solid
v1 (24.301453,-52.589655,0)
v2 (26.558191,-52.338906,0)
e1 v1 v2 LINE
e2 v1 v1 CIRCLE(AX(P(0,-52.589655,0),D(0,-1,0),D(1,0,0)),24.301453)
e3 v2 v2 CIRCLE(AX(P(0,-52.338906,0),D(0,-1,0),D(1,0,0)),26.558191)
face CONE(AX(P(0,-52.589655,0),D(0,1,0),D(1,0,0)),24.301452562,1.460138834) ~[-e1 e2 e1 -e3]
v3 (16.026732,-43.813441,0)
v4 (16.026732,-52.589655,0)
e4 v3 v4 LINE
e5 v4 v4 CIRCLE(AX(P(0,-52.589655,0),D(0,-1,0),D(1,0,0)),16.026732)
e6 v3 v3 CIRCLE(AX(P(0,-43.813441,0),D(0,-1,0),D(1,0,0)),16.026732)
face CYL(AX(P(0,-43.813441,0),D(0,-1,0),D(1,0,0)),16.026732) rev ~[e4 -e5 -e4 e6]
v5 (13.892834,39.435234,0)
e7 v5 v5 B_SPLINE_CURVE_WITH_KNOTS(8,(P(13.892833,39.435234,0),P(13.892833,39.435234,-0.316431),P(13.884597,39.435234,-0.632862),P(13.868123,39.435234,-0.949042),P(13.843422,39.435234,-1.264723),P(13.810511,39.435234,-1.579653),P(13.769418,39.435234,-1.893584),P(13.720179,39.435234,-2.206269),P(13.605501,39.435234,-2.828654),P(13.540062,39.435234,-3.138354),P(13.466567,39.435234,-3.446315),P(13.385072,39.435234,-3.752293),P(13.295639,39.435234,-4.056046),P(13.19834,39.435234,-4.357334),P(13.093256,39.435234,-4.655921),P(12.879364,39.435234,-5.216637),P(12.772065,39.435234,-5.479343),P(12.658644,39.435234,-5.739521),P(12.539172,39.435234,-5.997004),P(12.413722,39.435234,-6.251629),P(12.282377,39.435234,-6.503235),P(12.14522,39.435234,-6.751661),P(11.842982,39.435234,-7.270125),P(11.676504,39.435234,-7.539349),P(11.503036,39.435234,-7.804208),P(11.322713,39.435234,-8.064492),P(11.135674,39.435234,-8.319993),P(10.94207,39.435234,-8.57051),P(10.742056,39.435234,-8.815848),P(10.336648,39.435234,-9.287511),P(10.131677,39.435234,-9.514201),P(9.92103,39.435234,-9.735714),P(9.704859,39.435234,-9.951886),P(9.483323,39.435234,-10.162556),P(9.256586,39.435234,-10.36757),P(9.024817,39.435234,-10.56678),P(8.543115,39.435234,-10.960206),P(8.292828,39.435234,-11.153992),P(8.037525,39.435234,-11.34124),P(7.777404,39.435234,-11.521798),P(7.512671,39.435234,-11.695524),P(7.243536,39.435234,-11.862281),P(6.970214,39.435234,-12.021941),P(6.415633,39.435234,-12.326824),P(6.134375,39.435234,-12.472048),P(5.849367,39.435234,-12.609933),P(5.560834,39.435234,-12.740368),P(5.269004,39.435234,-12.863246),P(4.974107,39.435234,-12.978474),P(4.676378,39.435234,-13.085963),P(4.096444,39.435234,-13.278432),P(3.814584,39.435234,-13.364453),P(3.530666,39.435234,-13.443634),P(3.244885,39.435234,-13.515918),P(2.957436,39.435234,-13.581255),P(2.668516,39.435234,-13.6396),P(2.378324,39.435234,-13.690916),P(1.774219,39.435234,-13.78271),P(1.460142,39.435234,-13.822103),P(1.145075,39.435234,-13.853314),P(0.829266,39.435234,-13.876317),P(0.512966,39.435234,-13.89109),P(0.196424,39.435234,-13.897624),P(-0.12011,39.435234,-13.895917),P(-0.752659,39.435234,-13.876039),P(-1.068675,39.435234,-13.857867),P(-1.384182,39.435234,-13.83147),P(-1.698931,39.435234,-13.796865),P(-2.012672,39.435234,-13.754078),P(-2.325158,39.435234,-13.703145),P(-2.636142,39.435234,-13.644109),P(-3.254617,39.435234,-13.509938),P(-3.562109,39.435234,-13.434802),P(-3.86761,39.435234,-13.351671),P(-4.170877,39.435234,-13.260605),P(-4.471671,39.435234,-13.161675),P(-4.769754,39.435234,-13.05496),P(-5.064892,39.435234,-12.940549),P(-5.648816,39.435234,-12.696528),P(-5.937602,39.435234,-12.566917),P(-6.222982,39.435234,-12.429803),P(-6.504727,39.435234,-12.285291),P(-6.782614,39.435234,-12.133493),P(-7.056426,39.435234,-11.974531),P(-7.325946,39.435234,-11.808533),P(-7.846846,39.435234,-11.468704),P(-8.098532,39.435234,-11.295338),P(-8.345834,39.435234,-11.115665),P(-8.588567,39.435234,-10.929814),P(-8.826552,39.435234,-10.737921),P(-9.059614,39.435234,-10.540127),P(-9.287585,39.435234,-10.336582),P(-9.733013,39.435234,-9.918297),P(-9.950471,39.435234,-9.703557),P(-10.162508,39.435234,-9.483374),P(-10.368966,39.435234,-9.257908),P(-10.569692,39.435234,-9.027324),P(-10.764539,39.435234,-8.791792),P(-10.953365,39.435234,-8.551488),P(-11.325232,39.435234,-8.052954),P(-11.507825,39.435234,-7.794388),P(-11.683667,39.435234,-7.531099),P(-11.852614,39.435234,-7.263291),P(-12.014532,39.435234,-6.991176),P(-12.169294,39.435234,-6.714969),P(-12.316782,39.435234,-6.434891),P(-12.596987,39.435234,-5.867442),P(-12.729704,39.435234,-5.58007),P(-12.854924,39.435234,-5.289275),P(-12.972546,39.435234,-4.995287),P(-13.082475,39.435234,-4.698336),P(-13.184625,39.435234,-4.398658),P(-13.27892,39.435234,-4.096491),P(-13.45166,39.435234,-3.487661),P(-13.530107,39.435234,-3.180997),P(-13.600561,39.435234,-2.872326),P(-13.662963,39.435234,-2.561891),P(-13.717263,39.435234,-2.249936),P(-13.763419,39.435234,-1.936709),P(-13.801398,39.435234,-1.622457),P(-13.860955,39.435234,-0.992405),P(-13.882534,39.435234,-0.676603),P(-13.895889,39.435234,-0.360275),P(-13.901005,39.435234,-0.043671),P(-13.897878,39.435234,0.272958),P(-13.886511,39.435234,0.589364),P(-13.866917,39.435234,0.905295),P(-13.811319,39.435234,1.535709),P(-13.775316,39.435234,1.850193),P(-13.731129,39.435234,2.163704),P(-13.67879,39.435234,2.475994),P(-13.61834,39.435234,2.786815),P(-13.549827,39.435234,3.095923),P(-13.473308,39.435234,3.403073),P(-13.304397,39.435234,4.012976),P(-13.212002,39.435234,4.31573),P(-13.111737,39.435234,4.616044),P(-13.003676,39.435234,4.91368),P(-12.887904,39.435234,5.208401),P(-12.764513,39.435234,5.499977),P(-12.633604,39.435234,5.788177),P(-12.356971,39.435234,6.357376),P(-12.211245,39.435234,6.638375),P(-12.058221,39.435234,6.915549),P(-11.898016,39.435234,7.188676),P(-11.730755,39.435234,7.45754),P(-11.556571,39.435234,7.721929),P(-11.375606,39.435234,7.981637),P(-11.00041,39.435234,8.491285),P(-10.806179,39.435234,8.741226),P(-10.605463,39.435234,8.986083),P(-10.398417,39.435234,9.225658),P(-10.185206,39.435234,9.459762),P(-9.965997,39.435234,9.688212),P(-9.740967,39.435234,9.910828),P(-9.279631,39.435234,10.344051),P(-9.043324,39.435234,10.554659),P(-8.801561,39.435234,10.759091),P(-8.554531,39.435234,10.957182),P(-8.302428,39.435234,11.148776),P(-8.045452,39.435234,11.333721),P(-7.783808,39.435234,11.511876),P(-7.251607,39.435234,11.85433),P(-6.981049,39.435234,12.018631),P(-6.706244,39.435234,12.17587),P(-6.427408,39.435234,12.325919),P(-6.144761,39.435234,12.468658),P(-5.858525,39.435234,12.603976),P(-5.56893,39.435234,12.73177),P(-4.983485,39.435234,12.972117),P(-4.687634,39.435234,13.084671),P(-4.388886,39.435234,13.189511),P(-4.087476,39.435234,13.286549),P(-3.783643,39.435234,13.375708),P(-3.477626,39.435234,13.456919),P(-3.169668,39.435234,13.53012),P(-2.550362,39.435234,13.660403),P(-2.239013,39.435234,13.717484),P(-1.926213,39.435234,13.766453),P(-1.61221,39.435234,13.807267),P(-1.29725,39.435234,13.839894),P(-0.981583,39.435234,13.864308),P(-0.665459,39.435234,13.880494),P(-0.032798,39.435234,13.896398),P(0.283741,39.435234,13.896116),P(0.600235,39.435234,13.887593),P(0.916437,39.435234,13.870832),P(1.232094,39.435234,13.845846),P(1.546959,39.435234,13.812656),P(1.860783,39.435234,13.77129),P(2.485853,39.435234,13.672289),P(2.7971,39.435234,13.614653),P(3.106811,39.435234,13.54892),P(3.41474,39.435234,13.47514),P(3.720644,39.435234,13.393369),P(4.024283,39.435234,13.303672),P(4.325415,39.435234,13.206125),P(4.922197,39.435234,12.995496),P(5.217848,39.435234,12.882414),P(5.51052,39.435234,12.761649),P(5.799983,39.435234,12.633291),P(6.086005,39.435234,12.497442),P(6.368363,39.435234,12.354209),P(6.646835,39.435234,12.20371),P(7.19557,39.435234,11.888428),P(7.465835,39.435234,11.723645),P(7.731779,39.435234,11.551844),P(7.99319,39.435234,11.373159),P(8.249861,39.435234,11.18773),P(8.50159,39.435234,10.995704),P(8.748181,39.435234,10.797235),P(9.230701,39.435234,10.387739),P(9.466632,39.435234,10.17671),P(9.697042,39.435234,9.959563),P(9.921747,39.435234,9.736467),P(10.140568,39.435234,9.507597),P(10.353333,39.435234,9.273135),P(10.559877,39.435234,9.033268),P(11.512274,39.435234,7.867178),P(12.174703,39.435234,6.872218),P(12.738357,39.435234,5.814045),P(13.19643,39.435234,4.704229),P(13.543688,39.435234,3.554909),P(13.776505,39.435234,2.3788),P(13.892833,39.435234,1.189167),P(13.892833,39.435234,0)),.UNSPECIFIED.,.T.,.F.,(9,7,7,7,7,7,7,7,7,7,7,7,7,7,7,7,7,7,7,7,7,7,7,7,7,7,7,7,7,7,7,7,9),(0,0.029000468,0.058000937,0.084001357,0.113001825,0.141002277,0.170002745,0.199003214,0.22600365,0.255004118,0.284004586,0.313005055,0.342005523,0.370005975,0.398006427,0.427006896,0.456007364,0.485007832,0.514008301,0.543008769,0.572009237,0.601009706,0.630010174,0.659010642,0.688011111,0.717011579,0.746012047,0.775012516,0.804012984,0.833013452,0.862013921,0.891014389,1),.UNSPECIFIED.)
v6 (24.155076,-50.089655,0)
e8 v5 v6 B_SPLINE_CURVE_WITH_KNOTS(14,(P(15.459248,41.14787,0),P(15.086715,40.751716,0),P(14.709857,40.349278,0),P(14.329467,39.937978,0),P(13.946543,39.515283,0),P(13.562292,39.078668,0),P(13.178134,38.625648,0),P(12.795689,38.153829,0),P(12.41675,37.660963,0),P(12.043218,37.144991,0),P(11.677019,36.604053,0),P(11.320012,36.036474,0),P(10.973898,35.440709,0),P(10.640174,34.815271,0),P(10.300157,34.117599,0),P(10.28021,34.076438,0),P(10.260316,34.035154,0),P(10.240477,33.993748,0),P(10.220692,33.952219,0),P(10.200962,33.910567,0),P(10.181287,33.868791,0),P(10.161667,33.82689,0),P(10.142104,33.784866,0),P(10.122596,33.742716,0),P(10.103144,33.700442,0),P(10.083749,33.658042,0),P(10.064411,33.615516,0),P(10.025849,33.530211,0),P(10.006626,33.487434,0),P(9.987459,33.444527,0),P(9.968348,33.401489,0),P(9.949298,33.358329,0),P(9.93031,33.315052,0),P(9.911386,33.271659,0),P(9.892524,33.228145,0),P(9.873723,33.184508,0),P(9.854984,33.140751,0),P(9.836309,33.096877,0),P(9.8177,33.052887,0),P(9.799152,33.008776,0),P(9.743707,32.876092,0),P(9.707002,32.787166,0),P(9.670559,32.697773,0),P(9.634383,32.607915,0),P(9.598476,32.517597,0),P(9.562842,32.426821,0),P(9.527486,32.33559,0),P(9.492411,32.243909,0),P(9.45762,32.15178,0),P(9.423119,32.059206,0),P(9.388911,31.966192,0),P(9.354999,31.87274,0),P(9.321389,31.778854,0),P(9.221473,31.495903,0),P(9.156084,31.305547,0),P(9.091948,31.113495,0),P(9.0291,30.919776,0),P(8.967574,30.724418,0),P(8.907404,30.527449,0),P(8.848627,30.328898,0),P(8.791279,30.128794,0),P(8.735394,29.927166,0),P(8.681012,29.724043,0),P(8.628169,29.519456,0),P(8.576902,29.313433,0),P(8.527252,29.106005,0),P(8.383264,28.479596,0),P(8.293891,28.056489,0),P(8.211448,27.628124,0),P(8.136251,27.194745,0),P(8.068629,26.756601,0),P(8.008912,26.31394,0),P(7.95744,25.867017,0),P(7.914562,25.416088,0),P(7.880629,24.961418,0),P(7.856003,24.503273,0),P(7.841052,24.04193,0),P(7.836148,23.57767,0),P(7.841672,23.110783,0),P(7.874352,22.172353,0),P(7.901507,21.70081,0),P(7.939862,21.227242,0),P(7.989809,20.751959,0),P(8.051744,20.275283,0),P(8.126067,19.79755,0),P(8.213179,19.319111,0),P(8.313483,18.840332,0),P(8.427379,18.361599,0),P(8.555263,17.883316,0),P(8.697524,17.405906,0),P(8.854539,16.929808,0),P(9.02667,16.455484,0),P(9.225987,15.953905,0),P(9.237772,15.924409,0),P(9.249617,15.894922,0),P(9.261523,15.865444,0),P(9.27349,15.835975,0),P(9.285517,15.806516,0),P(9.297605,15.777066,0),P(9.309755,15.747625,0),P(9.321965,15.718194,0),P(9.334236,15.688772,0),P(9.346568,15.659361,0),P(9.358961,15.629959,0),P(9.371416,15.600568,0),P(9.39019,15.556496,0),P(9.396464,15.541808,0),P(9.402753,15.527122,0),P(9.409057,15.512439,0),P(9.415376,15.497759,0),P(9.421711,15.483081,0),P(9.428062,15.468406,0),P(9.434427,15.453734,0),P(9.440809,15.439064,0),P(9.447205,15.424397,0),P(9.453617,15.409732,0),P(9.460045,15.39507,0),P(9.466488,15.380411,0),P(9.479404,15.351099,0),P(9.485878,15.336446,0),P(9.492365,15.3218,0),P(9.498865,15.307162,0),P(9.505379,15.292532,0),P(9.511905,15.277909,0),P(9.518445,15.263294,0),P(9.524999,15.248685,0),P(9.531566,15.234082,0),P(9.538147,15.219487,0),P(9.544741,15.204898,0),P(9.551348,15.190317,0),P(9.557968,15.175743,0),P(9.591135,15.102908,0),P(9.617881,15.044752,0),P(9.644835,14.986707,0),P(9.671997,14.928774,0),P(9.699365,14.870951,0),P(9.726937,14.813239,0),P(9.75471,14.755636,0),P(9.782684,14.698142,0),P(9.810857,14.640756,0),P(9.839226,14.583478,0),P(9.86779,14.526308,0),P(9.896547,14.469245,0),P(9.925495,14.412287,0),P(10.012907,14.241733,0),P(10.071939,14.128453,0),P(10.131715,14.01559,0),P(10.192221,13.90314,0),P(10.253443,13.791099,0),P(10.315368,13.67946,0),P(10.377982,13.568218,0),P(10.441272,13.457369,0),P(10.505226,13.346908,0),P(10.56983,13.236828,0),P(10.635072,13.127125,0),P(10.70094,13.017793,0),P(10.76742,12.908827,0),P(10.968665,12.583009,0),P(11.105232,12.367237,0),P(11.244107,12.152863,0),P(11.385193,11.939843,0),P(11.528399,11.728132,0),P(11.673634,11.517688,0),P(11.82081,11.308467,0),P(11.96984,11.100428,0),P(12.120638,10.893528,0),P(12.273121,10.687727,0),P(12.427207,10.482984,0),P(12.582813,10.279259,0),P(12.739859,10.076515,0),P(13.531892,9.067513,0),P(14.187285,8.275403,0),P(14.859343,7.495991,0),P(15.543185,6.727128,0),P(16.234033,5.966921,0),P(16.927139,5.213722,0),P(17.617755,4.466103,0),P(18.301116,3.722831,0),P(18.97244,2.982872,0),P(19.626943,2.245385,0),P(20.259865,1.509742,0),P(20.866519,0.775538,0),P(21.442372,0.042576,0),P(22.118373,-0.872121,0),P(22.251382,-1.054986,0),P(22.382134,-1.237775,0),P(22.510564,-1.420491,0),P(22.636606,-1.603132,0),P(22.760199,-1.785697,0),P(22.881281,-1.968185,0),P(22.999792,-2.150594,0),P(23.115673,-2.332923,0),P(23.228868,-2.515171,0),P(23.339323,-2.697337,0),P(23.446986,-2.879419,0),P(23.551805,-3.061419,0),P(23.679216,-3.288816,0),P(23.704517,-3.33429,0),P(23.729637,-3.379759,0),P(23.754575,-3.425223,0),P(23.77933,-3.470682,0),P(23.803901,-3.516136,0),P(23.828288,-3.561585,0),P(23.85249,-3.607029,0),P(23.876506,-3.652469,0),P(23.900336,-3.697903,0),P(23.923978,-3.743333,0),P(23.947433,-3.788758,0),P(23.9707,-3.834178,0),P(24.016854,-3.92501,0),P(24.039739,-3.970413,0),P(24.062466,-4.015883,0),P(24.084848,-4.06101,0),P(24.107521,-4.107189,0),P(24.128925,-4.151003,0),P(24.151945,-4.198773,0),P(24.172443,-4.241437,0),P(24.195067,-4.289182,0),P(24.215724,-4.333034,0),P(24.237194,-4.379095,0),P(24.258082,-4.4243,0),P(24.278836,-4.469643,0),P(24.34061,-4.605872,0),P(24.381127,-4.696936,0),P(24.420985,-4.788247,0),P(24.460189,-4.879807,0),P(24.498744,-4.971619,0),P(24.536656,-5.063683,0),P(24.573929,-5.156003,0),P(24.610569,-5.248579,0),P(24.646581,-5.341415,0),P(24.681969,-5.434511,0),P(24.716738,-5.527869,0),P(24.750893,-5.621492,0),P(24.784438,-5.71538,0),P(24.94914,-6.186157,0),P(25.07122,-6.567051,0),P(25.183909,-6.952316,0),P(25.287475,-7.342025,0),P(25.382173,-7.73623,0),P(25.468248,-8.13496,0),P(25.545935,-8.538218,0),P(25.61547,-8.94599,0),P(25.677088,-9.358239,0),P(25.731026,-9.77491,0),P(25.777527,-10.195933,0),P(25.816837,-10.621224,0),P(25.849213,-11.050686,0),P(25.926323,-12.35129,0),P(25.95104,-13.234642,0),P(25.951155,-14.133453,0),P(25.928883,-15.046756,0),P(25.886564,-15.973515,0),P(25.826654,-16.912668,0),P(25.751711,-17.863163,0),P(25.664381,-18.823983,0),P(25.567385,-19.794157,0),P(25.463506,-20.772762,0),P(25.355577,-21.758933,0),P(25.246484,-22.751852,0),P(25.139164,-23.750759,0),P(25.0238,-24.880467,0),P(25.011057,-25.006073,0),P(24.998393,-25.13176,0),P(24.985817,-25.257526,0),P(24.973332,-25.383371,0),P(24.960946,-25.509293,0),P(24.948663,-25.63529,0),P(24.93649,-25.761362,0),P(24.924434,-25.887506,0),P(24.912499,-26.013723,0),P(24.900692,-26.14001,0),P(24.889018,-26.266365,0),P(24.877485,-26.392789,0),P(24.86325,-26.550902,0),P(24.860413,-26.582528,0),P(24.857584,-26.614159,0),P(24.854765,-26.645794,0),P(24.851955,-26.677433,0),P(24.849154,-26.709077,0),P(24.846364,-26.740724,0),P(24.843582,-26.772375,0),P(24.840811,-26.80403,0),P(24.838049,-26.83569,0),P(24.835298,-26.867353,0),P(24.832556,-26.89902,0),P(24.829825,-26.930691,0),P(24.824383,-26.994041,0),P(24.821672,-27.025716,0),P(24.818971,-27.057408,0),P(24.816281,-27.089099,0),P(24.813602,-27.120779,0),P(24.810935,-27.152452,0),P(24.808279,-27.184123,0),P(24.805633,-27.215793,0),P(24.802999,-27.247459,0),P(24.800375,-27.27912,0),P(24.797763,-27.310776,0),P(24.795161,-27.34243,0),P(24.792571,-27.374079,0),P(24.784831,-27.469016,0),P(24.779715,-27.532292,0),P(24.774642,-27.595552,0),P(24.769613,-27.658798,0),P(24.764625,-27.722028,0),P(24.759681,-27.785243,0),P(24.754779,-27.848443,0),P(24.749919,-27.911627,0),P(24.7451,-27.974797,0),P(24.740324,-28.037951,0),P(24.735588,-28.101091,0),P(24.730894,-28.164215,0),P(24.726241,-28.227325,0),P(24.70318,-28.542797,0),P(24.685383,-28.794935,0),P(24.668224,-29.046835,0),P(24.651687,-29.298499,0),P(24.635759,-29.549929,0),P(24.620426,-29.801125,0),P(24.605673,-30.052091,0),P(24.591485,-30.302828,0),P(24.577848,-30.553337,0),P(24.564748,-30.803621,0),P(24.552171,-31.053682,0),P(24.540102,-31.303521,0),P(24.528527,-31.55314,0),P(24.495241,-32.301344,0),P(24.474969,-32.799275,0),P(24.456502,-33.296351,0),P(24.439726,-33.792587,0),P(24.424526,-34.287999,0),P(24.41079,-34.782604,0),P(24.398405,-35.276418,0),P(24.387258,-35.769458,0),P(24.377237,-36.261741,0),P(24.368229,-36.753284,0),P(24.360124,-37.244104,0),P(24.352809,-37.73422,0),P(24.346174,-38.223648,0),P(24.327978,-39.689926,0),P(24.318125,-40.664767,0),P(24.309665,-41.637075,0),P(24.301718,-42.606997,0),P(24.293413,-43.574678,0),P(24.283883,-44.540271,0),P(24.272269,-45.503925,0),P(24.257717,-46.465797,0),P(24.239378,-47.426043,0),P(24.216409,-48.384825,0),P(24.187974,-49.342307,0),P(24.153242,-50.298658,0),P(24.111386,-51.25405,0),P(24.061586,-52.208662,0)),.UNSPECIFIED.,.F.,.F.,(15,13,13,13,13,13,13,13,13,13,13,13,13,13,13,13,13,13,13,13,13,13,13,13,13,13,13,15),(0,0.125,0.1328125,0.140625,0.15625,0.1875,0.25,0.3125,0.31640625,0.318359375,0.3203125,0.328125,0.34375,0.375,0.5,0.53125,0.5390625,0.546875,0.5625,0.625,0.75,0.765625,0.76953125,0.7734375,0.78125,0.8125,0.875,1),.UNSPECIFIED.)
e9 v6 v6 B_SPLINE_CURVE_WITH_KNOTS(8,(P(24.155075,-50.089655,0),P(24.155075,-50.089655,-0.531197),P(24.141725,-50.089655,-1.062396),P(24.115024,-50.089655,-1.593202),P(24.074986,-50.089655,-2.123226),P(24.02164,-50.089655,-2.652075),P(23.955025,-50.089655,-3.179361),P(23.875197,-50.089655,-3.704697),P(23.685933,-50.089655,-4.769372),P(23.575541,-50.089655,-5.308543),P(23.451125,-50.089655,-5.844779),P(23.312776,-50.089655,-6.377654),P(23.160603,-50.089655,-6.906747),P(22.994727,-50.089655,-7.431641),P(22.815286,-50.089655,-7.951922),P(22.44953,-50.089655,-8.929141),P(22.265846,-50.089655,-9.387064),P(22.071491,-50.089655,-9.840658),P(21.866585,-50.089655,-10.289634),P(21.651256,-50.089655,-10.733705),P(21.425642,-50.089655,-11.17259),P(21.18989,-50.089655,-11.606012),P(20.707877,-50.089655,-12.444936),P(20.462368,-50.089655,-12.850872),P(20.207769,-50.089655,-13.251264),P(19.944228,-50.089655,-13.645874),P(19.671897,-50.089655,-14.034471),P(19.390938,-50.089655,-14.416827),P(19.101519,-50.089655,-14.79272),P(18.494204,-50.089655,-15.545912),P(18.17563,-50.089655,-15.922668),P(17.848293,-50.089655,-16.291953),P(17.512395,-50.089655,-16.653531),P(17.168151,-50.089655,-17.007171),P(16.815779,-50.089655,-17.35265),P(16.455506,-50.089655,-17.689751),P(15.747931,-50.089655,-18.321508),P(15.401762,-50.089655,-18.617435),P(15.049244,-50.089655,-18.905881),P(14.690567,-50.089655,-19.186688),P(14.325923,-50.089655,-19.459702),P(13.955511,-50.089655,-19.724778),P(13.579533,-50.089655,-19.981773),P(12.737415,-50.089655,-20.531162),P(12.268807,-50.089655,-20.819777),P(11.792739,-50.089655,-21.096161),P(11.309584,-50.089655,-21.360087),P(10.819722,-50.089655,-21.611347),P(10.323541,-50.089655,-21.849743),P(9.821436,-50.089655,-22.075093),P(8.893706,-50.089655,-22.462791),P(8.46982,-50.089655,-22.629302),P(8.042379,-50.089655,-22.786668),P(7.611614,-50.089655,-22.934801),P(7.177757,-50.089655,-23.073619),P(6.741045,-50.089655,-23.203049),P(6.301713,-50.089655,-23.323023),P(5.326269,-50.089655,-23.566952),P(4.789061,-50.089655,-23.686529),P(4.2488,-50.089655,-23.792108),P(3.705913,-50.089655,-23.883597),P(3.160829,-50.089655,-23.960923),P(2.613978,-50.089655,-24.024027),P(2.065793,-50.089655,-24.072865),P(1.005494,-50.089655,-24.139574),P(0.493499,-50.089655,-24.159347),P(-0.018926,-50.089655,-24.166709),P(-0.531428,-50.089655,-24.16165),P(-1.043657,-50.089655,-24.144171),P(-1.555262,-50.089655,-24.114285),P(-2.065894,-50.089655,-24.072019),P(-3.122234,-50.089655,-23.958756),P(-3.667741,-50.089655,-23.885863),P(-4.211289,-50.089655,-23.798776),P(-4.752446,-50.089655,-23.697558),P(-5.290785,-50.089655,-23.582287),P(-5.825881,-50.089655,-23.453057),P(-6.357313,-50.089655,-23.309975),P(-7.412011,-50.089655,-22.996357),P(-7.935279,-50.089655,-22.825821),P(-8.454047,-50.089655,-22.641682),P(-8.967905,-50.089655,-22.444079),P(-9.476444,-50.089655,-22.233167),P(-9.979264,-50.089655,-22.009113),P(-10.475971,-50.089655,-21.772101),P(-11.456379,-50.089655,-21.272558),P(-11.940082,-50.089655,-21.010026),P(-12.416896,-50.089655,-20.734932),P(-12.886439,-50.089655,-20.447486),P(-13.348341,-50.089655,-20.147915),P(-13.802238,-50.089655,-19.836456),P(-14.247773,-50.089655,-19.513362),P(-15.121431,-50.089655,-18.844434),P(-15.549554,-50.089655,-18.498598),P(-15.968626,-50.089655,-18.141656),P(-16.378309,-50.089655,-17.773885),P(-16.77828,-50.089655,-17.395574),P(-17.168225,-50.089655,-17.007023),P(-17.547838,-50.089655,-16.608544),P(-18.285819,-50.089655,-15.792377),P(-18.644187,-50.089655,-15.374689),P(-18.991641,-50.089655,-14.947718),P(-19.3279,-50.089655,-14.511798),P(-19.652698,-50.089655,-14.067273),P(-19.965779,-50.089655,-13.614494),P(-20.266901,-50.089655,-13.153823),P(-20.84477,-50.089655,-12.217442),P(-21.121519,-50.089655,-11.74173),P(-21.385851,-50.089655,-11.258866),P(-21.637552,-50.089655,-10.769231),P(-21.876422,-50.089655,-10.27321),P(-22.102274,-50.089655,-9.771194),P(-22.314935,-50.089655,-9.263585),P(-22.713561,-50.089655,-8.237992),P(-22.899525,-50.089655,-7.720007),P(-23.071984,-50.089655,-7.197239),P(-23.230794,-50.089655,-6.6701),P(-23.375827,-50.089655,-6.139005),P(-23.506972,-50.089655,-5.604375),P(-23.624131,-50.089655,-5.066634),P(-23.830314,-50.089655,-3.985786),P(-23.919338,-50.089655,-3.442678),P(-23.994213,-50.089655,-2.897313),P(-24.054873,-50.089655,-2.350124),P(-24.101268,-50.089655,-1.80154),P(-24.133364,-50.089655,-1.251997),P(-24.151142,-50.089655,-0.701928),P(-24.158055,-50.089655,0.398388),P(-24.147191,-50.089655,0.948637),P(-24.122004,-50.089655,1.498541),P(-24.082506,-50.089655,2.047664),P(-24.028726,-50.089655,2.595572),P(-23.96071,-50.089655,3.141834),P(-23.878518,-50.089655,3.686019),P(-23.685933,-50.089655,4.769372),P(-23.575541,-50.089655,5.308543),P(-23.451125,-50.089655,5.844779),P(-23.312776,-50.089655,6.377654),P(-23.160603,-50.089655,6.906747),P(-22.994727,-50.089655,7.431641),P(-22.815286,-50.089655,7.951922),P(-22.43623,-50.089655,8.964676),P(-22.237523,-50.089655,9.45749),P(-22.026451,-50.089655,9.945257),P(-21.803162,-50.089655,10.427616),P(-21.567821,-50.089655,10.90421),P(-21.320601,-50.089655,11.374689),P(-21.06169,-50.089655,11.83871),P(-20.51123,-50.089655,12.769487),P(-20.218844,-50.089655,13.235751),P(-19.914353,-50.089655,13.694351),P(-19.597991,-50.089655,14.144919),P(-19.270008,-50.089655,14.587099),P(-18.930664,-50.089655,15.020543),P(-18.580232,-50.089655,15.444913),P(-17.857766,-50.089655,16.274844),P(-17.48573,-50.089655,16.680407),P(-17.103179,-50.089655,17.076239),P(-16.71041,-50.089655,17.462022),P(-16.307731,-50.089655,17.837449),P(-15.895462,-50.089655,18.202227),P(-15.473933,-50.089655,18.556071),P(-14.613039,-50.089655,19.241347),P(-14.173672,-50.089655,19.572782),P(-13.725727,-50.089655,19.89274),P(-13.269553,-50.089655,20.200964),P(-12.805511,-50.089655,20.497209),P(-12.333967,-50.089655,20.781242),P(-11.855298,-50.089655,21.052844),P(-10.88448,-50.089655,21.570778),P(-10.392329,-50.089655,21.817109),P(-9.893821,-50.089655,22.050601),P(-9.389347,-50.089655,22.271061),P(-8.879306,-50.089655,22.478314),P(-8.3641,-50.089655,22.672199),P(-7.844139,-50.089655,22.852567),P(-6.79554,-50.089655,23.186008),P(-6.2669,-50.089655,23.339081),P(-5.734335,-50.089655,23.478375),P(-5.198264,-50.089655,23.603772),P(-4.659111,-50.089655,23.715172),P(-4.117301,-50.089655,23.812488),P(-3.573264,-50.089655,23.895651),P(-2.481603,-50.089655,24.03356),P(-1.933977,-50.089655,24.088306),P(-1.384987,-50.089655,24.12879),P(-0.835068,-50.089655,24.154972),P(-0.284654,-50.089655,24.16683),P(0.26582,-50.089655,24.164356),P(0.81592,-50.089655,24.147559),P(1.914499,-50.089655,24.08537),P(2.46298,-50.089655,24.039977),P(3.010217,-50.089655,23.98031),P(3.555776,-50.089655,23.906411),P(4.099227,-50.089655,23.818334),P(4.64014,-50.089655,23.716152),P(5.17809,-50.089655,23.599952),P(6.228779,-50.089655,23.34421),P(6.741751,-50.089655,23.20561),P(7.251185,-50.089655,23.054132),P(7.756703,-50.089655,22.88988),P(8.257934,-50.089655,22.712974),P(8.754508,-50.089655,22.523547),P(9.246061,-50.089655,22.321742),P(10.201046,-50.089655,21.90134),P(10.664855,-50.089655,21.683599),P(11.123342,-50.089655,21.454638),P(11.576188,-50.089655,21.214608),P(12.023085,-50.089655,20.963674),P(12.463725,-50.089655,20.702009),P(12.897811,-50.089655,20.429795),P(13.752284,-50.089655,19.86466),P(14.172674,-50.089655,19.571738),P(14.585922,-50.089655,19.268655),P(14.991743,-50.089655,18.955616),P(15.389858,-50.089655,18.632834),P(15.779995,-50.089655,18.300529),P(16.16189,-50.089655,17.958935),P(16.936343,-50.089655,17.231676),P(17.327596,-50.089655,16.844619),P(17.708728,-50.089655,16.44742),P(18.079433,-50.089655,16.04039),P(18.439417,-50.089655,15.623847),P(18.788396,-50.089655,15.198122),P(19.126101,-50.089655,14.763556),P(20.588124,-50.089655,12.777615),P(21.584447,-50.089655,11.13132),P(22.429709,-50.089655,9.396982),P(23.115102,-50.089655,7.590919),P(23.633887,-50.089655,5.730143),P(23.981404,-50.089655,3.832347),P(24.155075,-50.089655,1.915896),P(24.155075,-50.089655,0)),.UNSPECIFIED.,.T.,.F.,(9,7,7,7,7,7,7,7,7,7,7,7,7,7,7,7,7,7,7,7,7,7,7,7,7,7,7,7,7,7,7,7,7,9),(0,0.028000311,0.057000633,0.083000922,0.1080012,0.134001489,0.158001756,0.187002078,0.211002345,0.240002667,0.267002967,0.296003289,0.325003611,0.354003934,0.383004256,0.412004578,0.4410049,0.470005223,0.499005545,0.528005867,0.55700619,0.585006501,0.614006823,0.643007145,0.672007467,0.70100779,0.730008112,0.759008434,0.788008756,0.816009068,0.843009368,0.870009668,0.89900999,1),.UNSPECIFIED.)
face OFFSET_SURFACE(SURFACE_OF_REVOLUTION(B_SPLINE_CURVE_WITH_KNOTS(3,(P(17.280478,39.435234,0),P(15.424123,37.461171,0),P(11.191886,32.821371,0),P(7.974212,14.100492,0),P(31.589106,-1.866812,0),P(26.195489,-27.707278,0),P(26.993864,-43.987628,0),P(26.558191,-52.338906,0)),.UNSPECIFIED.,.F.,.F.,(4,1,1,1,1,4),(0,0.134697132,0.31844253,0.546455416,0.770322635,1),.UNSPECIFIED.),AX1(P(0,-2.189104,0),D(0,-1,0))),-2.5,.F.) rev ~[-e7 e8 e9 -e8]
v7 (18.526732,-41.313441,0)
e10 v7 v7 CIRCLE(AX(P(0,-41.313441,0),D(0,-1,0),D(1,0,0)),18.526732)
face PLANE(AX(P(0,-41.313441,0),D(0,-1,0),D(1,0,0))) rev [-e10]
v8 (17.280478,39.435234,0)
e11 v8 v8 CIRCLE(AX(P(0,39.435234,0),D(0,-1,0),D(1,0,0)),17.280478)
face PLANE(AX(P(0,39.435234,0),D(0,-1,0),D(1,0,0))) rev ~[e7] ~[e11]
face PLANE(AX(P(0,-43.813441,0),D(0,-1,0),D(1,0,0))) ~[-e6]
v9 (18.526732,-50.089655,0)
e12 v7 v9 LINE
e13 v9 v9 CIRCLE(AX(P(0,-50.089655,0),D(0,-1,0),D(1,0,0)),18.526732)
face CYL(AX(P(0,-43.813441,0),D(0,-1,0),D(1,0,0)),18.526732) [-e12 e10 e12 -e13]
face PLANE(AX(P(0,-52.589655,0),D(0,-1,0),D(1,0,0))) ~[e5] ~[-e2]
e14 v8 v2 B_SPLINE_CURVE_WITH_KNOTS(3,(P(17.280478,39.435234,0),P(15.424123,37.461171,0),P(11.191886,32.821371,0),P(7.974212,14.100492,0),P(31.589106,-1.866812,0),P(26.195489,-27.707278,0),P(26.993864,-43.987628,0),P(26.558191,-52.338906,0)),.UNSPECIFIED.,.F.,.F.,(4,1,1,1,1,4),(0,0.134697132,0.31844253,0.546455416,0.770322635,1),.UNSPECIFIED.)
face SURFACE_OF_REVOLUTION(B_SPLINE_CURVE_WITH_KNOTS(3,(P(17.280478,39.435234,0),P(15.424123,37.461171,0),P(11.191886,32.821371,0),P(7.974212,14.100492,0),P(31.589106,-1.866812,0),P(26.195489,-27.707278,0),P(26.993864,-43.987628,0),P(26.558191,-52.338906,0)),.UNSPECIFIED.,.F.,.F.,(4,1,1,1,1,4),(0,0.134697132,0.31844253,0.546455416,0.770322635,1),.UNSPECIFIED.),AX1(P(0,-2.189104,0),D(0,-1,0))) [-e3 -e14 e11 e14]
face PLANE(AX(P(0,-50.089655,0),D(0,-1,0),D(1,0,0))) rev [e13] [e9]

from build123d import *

# Parameters (mm, degrees)
F2_T = 2.5


# Not quite as in the source:
# - a shell that OpenCascade refuses in one call is made with other operations: the cavity is built on its own and cut out


with BuildPart() as f1:
    # F0 (on Top) → F1 (revolve)
    with BuildSketch(Plane.XY):
        with BuildLine():
            Line((17.2804780304, 39.4352339208), (0, 39.4352339208))
            Line((0, 39.4352339208), (0, -43.8134409487))
            Line((0, -43.8134409487), (16.0267315805, -43.8134409487))
            Line((16.0267315805, -43.8134409487), (16.0267315805, -52.5896549225))
            Line((16.0267315805, -52.5896549225), (24.3014525622, -52.5896549225))
            Line((24.3014525622, -52.5896549225), (26.5581905842, -52.3389056325))
            add(Edge.make_bspline(
                [(17.2804780304, 39.4352339208), (15.4241225487, 37.4611710574), (11.1918862105, 32.8213707524), (7.9742124467, 14.100491533), (31.589105581, -1.866812475), (26.1954888157, -27.7072783001), (26.9938640556, -43.9876284398), (26.5581905842, -52.3389056325)],
                knots=[0, 0, 0, 0, 0.1346971319, 0.3184425297, 0.5464554161, 0.7703226354, 1, 1, 1, 1], degree=3))
        make_face()
    revolve(axis=Axis((0, -2.189103514, 0), (0, -1, 0)))

    # F2: shell of thickness 2.5, made by hand


with BuildPart() as f2_core1:
    # F2_t2: copy of F1
    add(f1.part)

    # the walls: a layer under each face that stays
    f2_faces = [f2_core1.faces().sort_by_distance(p)[0] for p in [
        (0, -43.8134409487, 0),
        (-16.0267315805, -48.2015479356, 0),
        (16.2009683748, -52.5896549225, -16.2009683748),
        (-25.4298215732, -52.4642802775, 0),
        (-23.9936965882, 0.7966822698, 0),
    ]]
    thicken(f2_faces, amount=-F2_T, mode=Mode.SUBTRACT)

    # F2_s3 → F2_t4 (revolve, cut)
    with BuildSketch(Plane.XY):
        Polygon((16.0017315805, -43.8384409487), (16.0267315805, -41.3134409487), (18.5267315805, -41.3134409487), (18.5267315805, -43.8134409487), align=None)
    revolve(axis=Axis((0, -43.8134409487, 0), (0, -1, 0)), mode=Mode.SUBTRACT)


with BuildPart() as f1_1:
    add(f1.part)

    # what is left inside the walls is the cavity
    f2_cavity = [f2_core1.part.solids().sort_by_distance(p)[0] for p in [
        (-11.283337, 12.053715, 0),
    ]]
    add(f2_cavity, mode=Mode.SUBTRACT)


solid = f1_1.part
